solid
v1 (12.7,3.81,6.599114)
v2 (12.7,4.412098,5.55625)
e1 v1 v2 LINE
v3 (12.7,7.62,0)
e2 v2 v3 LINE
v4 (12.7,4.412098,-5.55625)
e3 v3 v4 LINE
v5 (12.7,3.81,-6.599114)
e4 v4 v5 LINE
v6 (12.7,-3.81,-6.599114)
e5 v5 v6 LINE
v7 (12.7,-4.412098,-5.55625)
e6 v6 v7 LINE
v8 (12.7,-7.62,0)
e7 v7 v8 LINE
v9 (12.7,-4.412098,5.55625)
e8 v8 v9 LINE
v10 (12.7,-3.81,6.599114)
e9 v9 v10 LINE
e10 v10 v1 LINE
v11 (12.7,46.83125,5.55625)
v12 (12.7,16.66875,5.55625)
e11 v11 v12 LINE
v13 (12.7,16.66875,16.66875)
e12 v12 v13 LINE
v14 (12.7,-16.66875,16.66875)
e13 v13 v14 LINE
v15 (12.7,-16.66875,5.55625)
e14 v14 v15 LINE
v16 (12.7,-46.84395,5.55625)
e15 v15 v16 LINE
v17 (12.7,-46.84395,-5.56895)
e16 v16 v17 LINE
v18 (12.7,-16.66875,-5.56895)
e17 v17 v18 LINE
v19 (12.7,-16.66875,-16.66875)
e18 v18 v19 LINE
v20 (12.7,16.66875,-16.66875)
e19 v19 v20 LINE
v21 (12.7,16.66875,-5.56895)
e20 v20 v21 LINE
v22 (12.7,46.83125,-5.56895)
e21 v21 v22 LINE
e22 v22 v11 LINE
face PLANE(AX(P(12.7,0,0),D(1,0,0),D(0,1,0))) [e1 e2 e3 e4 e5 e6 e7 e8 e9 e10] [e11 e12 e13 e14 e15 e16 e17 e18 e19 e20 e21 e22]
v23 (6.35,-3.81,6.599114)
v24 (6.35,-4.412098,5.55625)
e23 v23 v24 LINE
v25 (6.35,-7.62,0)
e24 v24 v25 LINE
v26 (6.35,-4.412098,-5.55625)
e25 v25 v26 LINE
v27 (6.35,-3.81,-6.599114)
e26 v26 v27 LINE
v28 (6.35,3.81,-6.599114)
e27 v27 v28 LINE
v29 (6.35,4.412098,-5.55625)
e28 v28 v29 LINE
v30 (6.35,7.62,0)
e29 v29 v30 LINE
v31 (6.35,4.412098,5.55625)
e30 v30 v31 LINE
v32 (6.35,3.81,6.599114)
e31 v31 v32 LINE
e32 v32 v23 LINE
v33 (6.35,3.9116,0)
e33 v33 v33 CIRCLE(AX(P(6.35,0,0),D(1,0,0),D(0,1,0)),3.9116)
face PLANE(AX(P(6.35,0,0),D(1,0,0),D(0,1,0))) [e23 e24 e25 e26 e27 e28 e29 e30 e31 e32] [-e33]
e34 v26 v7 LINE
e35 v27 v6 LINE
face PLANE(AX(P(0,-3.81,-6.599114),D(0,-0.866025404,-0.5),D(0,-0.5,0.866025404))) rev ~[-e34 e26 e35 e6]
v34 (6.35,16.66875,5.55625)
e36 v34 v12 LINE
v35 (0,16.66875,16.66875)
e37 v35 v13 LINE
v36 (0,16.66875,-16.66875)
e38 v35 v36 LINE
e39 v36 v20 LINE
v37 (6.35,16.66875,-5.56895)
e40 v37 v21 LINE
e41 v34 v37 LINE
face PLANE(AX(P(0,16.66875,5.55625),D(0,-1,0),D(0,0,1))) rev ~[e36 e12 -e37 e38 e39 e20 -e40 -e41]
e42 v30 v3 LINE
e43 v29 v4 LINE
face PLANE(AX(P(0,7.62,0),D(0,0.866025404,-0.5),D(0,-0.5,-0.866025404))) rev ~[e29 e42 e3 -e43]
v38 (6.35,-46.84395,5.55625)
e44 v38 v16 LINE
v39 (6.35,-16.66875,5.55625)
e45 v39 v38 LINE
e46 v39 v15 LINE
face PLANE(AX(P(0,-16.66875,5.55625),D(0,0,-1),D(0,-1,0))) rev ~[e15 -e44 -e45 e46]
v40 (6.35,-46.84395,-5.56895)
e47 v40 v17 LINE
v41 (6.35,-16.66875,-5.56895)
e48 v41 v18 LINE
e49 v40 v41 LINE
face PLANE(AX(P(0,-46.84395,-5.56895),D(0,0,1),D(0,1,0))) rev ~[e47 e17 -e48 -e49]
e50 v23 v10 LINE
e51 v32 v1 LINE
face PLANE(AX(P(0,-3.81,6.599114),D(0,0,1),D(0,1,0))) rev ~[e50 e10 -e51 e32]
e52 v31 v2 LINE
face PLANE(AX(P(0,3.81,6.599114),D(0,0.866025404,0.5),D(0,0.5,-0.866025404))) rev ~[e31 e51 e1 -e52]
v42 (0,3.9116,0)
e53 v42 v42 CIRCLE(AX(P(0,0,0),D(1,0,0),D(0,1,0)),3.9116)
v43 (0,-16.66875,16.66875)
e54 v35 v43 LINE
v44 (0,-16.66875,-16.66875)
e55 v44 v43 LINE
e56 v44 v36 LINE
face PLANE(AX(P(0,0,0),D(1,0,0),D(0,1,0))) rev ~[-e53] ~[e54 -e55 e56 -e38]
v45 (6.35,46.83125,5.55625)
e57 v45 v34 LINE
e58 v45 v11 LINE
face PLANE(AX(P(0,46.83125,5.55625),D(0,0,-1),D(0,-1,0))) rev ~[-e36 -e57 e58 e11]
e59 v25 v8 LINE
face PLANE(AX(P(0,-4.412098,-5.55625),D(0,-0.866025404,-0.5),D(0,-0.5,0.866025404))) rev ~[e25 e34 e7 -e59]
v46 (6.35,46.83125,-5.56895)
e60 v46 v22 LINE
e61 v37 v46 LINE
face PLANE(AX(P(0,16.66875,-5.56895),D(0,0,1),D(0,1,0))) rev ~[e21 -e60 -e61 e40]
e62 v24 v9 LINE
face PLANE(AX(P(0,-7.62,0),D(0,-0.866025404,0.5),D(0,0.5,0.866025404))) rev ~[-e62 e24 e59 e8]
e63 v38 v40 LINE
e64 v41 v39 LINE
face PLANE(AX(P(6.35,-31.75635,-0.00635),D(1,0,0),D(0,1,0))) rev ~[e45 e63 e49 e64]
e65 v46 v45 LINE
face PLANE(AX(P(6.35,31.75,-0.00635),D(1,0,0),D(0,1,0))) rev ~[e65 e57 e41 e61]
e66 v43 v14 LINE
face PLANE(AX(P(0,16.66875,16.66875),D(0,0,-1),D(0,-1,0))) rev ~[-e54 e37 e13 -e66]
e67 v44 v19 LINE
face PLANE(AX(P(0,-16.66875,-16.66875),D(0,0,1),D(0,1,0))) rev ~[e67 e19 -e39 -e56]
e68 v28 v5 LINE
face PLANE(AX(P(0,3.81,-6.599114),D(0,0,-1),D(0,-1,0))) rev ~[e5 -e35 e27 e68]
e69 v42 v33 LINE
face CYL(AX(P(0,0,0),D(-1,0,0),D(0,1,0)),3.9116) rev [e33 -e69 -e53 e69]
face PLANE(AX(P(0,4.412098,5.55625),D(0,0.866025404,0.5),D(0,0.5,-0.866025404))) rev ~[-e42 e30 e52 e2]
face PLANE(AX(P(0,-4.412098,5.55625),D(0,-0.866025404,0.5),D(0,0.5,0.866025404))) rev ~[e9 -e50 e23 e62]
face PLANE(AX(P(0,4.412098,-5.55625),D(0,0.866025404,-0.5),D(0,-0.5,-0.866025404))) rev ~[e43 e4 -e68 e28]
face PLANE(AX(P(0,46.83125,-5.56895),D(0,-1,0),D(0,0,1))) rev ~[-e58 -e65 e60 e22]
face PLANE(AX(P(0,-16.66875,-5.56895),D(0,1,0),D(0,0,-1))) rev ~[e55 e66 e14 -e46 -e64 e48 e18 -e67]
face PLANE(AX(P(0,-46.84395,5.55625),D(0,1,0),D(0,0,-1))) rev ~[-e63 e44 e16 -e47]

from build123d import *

# Parameters (mm, degrees)
F1_DEPTH = 12.7
F0_R     = 3.9116
F2_DEPTH = 6.35
F3_DEPTH = 6.35


# Not quite as in the source:
# - a length typed as a fraction of an inch, garbled in the dataset ("3 / 203.2 mm" for 3/8 in), is restored


with BuildPart() as f1:
    # F0 (on Right) → F1 (new body)
    with BuildSketch(Plane.YZ):
        Polygon((16.66875, -5.55625), (16.66875, 5.55625), (16.66875, 16.66875), (-16.66875, 16.66875), (-16.66875, 5.55625), (-16.66875, -5.55625), (-16.66875, -5.56895), (-16.66875, -16.66875), (16.66875, -16.66875), (16.66875, -5.56895), align=None)
        Polygon((-4.4120975668, 5.55625), (-3.81, 6.5991135768), (3.81, 6.5991135768), (4.4120975668, 5.55625), (7.62, 0), (4.4120975668, -5.55625), (3.81, -6.5991135768), (-3.81, -6.5991135768), (-4.4120975668, -5.55625), (-7.62, 0), align=None, mode=Mode.SUBTRACT)
        Polygon((-16.66875, -5.55625), (-16.66875, 5.55625), (-46.84395, 5.55625), (-46.84395, -5.56895), (-16.66875, -5.56895), align=None)
        Polygon((46.83125, 5.55625), (16.66875, 5.55625), (16.66875, -5.55625), (16.66875, -5.56895), (46.83125, -5.56895), align=None)
    extrude(amount=F1_DEPTH)

    # F0 (on Right) → F2 (join)
    with BuildSketch(Plane.YZ):
        Polygon((3.81, 6.5991135768), (-3.81, 6.5991135768), (-4.4120975668, 5.55625), (-7.62, 0), (-4.4120975668, -5.55625), (-3.81, -6.5991135768), (3.81, -6.5991135768), (4.4120975668, -5.55625), (7.62, 0), (4.4120975668, 5.55625), align=None)
        Circle(F0_R, mode=Mode.SUBTRACT)
    extrude(amount=F2_DEPTH)

    # F0 (on Right) → F3 (cut)
    with BuildSketch(Plane.YZ):
        Polygon((-16.66875, -5.55625), (-16.66875, 5.55625), (-46.84395, 5.55625), (-46.84395, -5.56895), (-16.66875, -5.56895), align=None)
        Polygon((46.83125, 5.55625), (16.66875, 5.55625), (16.66875, -5.55625), (16.66875, -5.56895), (46.83125, -5.56895), align=None)
    extrude(amount=F3_DEPTH, mode=Mode.SUBTRACT)


solid = f1.part
